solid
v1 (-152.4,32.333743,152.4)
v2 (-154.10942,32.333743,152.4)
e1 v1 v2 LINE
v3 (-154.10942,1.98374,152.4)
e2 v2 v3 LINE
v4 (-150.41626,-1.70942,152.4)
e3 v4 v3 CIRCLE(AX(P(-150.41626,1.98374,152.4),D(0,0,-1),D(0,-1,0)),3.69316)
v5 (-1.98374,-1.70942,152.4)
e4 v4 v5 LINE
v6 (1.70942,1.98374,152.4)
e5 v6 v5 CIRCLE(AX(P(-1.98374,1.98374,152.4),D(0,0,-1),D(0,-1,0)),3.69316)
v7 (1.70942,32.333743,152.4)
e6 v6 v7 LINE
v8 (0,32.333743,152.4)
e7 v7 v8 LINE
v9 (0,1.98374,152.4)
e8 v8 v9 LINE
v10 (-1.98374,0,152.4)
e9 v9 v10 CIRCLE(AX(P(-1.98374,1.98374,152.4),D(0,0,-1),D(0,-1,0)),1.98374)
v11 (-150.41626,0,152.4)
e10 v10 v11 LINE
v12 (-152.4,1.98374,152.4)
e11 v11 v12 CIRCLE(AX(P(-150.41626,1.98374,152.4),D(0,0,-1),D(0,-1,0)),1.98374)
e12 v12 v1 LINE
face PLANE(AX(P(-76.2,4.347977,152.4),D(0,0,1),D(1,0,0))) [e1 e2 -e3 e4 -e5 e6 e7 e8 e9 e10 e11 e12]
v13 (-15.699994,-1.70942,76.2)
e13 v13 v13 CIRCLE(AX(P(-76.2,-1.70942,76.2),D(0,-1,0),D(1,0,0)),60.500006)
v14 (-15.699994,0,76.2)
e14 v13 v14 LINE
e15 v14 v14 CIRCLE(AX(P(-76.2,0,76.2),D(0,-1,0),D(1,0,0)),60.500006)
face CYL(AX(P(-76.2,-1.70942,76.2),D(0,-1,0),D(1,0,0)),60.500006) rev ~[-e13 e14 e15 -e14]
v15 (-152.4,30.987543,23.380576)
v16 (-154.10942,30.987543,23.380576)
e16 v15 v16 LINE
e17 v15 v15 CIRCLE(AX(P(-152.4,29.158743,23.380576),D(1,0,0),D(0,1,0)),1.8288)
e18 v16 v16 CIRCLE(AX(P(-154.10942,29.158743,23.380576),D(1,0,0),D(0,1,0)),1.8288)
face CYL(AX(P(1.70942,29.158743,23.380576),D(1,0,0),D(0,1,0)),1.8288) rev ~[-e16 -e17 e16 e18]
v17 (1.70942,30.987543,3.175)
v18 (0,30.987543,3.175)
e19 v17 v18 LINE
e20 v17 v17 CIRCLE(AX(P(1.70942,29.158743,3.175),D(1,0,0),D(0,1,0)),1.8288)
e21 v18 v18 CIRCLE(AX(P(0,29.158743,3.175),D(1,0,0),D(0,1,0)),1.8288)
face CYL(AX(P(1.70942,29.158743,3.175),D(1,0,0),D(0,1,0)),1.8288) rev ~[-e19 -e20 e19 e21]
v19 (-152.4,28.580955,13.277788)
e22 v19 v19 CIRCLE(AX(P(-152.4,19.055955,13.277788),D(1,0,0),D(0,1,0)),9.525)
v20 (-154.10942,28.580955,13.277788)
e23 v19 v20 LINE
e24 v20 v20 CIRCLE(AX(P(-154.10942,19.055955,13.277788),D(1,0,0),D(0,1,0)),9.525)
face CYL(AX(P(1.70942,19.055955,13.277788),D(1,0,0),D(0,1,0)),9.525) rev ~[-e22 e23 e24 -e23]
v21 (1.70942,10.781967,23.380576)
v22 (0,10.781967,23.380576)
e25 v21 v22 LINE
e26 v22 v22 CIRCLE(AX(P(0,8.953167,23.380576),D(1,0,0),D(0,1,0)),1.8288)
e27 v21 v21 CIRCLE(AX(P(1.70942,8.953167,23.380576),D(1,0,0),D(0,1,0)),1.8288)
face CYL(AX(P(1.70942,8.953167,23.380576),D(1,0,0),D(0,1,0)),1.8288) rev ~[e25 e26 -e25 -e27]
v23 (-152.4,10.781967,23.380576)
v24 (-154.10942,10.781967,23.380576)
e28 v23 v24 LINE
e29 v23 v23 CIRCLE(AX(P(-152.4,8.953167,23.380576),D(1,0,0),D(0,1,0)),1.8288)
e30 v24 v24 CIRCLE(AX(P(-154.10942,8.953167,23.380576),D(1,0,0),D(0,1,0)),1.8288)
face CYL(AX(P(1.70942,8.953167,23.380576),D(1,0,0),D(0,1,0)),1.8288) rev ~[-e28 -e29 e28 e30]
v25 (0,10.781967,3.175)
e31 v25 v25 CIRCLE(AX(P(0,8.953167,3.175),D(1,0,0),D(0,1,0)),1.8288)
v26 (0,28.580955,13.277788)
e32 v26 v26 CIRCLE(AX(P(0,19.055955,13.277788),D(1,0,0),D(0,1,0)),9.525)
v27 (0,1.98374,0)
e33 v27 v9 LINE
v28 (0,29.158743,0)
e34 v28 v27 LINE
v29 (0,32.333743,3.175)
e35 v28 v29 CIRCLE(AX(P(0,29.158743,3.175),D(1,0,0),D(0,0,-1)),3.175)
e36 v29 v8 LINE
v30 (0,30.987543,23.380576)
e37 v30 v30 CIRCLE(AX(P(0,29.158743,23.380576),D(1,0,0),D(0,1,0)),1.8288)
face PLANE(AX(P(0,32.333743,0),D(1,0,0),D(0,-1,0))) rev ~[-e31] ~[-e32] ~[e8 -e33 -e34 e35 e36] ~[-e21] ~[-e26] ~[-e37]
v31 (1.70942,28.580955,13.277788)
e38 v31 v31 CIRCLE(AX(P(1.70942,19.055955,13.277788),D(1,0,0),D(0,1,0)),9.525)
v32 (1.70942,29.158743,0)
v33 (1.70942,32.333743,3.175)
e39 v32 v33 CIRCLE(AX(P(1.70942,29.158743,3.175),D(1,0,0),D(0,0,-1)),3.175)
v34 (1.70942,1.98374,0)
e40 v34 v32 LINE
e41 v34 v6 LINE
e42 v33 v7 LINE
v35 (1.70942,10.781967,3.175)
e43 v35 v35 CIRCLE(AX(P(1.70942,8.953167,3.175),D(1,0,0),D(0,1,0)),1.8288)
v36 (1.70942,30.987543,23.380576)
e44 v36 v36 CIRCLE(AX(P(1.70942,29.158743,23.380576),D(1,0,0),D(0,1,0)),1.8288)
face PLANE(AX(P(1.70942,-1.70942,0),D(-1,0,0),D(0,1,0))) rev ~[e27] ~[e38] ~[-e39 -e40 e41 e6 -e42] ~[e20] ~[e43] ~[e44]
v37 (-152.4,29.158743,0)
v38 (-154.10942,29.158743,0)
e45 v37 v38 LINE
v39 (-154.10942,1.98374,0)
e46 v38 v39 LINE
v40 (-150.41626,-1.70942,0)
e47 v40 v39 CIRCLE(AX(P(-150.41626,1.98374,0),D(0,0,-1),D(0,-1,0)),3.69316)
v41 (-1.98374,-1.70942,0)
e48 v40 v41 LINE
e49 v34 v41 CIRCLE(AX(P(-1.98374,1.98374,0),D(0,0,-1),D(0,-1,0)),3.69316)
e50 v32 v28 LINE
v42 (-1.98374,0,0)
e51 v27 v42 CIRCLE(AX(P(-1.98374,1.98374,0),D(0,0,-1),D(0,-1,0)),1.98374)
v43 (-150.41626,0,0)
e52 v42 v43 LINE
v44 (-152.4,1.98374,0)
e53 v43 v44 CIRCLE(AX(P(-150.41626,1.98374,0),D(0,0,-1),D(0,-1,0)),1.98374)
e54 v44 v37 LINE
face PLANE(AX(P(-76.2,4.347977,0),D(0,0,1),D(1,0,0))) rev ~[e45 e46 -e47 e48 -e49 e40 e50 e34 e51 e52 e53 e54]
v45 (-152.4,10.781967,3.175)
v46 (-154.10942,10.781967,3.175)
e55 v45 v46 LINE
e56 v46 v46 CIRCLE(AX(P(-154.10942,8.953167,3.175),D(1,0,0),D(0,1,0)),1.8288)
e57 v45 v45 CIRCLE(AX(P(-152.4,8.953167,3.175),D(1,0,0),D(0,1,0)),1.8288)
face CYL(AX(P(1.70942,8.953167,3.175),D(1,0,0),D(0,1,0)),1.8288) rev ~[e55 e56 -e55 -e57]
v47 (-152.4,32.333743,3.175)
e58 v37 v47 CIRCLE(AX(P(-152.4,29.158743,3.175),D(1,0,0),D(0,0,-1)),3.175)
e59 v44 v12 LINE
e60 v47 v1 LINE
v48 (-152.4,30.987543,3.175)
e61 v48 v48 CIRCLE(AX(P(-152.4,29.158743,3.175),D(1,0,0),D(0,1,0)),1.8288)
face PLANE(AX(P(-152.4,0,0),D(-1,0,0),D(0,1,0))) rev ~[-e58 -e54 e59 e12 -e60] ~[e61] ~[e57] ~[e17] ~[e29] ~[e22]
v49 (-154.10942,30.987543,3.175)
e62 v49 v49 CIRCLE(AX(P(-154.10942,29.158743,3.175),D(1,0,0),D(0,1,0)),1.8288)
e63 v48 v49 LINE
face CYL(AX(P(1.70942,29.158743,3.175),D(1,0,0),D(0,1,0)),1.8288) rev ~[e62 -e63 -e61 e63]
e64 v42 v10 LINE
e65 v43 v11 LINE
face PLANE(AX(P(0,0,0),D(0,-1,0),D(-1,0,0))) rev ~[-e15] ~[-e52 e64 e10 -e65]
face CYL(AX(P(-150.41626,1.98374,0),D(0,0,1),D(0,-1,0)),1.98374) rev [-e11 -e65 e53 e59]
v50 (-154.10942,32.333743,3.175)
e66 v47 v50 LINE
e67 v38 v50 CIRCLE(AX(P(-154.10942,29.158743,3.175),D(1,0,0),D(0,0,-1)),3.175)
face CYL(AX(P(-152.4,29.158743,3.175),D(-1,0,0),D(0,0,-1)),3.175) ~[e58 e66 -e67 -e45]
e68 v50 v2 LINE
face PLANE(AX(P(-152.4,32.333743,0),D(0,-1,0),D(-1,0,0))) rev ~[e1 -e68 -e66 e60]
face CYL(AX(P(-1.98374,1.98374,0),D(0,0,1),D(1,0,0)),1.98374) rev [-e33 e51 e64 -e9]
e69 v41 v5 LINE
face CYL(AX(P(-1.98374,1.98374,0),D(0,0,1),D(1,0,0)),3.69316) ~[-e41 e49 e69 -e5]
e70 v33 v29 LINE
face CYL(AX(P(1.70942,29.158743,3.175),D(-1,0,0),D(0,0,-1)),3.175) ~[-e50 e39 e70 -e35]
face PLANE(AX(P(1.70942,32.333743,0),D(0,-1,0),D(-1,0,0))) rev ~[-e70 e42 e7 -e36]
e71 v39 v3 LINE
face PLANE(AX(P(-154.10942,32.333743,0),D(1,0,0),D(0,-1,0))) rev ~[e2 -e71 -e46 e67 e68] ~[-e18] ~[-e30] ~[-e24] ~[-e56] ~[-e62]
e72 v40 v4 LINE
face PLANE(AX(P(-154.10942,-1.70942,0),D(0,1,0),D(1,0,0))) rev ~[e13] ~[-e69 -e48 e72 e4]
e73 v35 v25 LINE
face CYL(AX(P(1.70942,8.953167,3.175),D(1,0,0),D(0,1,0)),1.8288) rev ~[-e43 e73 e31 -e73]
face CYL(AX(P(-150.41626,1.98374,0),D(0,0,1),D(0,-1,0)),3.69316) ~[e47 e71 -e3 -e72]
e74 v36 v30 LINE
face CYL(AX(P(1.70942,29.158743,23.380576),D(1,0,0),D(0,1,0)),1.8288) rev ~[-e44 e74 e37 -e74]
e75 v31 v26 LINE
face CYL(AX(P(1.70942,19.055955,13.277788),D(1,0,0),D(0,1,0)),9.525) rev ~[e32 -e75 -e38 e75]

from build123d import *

# Parameters (mm, degrees)
F1_DEPTH = 152.4
F2_R     = 1.98374
F3_R     = 3.69316
F4_R     = 3.175
F5_R     = 9.525
F5_R_2   = 1.8288
F6_DEPTH = 155.81884
F7_R     = 60.500006
F8_DEPTH = 1.70942


with BuildPart() as f1:
    # F0 (on Top) → F1 (new body)
    with BuildSketch(Plane.XY):
        Polygon((0, 32.3337428), (0, 0), (-152.4, 0), (-152.4, 32.3337428), (-154.10942, 32.3337428), (-154.10942, -1.70942), (1.70942, -1.70942), (1.70942, 32.3337428), align=None)
    extrude(amount=F1_DEPTH)

    # F2
    f2_edges = [f1.edges().sort_by_distance(p)[0] for p in [
        (0, 0, 76.2),
        (-152.4, 0, 76.2),
    ]]
    fillet(f2_edges, radius=F2_R)

    # F3
    f3_edges = [f1.edges().sort_by_distance(p)[0] for p in [
        (1.70942, -1.70942, 76.2),
        (-154.10942, -1.70942, 76.2),
    ]]
    fillet(f3_edges, radius=F3_R)

    # F4
    f4_edges = [f1.edges().sort_by_distance(p)[0] for p in [
        (-153.25471, 32.333743, 0),
        (0.85471, 32.333743, 0),
    ]]
    fillet(f4_edges, radius=F4_R)

    # F5 (on face) → F6 (cut, through all)
    with BuildSketch(Plane.YZ.offset(1.70942)):
        with Locations((19.0559546638, 13.2777881362)):
            Circle(F5_R)
        with Locations((29.1587428, 23.3805762724)):
            Circle(F5_R_2)
        with Locations((29.1587428, 3.175)):
            Circle(F5_R_2)
        with Locations((8.9531665276, 3.175)):
            Circle(F5_R_2)
        with Locations((8.9531665276, 23.3805762724)):
            Circle(F5_R_2)
    extrude(amount=-F6_DEPTH, mode=Mode.SUBTRACT)

    # F7 (on face) → F8 (cut, through all)
    with BuildSketch(Plane.XZ.offset(1.70942)):
        with Locations((-76.2, 76.2)):
            Circle(F7_R)
    extrude(amount=-F8_DEPTH, mode=Mode.SUBTRACT)


solid = f1.part
